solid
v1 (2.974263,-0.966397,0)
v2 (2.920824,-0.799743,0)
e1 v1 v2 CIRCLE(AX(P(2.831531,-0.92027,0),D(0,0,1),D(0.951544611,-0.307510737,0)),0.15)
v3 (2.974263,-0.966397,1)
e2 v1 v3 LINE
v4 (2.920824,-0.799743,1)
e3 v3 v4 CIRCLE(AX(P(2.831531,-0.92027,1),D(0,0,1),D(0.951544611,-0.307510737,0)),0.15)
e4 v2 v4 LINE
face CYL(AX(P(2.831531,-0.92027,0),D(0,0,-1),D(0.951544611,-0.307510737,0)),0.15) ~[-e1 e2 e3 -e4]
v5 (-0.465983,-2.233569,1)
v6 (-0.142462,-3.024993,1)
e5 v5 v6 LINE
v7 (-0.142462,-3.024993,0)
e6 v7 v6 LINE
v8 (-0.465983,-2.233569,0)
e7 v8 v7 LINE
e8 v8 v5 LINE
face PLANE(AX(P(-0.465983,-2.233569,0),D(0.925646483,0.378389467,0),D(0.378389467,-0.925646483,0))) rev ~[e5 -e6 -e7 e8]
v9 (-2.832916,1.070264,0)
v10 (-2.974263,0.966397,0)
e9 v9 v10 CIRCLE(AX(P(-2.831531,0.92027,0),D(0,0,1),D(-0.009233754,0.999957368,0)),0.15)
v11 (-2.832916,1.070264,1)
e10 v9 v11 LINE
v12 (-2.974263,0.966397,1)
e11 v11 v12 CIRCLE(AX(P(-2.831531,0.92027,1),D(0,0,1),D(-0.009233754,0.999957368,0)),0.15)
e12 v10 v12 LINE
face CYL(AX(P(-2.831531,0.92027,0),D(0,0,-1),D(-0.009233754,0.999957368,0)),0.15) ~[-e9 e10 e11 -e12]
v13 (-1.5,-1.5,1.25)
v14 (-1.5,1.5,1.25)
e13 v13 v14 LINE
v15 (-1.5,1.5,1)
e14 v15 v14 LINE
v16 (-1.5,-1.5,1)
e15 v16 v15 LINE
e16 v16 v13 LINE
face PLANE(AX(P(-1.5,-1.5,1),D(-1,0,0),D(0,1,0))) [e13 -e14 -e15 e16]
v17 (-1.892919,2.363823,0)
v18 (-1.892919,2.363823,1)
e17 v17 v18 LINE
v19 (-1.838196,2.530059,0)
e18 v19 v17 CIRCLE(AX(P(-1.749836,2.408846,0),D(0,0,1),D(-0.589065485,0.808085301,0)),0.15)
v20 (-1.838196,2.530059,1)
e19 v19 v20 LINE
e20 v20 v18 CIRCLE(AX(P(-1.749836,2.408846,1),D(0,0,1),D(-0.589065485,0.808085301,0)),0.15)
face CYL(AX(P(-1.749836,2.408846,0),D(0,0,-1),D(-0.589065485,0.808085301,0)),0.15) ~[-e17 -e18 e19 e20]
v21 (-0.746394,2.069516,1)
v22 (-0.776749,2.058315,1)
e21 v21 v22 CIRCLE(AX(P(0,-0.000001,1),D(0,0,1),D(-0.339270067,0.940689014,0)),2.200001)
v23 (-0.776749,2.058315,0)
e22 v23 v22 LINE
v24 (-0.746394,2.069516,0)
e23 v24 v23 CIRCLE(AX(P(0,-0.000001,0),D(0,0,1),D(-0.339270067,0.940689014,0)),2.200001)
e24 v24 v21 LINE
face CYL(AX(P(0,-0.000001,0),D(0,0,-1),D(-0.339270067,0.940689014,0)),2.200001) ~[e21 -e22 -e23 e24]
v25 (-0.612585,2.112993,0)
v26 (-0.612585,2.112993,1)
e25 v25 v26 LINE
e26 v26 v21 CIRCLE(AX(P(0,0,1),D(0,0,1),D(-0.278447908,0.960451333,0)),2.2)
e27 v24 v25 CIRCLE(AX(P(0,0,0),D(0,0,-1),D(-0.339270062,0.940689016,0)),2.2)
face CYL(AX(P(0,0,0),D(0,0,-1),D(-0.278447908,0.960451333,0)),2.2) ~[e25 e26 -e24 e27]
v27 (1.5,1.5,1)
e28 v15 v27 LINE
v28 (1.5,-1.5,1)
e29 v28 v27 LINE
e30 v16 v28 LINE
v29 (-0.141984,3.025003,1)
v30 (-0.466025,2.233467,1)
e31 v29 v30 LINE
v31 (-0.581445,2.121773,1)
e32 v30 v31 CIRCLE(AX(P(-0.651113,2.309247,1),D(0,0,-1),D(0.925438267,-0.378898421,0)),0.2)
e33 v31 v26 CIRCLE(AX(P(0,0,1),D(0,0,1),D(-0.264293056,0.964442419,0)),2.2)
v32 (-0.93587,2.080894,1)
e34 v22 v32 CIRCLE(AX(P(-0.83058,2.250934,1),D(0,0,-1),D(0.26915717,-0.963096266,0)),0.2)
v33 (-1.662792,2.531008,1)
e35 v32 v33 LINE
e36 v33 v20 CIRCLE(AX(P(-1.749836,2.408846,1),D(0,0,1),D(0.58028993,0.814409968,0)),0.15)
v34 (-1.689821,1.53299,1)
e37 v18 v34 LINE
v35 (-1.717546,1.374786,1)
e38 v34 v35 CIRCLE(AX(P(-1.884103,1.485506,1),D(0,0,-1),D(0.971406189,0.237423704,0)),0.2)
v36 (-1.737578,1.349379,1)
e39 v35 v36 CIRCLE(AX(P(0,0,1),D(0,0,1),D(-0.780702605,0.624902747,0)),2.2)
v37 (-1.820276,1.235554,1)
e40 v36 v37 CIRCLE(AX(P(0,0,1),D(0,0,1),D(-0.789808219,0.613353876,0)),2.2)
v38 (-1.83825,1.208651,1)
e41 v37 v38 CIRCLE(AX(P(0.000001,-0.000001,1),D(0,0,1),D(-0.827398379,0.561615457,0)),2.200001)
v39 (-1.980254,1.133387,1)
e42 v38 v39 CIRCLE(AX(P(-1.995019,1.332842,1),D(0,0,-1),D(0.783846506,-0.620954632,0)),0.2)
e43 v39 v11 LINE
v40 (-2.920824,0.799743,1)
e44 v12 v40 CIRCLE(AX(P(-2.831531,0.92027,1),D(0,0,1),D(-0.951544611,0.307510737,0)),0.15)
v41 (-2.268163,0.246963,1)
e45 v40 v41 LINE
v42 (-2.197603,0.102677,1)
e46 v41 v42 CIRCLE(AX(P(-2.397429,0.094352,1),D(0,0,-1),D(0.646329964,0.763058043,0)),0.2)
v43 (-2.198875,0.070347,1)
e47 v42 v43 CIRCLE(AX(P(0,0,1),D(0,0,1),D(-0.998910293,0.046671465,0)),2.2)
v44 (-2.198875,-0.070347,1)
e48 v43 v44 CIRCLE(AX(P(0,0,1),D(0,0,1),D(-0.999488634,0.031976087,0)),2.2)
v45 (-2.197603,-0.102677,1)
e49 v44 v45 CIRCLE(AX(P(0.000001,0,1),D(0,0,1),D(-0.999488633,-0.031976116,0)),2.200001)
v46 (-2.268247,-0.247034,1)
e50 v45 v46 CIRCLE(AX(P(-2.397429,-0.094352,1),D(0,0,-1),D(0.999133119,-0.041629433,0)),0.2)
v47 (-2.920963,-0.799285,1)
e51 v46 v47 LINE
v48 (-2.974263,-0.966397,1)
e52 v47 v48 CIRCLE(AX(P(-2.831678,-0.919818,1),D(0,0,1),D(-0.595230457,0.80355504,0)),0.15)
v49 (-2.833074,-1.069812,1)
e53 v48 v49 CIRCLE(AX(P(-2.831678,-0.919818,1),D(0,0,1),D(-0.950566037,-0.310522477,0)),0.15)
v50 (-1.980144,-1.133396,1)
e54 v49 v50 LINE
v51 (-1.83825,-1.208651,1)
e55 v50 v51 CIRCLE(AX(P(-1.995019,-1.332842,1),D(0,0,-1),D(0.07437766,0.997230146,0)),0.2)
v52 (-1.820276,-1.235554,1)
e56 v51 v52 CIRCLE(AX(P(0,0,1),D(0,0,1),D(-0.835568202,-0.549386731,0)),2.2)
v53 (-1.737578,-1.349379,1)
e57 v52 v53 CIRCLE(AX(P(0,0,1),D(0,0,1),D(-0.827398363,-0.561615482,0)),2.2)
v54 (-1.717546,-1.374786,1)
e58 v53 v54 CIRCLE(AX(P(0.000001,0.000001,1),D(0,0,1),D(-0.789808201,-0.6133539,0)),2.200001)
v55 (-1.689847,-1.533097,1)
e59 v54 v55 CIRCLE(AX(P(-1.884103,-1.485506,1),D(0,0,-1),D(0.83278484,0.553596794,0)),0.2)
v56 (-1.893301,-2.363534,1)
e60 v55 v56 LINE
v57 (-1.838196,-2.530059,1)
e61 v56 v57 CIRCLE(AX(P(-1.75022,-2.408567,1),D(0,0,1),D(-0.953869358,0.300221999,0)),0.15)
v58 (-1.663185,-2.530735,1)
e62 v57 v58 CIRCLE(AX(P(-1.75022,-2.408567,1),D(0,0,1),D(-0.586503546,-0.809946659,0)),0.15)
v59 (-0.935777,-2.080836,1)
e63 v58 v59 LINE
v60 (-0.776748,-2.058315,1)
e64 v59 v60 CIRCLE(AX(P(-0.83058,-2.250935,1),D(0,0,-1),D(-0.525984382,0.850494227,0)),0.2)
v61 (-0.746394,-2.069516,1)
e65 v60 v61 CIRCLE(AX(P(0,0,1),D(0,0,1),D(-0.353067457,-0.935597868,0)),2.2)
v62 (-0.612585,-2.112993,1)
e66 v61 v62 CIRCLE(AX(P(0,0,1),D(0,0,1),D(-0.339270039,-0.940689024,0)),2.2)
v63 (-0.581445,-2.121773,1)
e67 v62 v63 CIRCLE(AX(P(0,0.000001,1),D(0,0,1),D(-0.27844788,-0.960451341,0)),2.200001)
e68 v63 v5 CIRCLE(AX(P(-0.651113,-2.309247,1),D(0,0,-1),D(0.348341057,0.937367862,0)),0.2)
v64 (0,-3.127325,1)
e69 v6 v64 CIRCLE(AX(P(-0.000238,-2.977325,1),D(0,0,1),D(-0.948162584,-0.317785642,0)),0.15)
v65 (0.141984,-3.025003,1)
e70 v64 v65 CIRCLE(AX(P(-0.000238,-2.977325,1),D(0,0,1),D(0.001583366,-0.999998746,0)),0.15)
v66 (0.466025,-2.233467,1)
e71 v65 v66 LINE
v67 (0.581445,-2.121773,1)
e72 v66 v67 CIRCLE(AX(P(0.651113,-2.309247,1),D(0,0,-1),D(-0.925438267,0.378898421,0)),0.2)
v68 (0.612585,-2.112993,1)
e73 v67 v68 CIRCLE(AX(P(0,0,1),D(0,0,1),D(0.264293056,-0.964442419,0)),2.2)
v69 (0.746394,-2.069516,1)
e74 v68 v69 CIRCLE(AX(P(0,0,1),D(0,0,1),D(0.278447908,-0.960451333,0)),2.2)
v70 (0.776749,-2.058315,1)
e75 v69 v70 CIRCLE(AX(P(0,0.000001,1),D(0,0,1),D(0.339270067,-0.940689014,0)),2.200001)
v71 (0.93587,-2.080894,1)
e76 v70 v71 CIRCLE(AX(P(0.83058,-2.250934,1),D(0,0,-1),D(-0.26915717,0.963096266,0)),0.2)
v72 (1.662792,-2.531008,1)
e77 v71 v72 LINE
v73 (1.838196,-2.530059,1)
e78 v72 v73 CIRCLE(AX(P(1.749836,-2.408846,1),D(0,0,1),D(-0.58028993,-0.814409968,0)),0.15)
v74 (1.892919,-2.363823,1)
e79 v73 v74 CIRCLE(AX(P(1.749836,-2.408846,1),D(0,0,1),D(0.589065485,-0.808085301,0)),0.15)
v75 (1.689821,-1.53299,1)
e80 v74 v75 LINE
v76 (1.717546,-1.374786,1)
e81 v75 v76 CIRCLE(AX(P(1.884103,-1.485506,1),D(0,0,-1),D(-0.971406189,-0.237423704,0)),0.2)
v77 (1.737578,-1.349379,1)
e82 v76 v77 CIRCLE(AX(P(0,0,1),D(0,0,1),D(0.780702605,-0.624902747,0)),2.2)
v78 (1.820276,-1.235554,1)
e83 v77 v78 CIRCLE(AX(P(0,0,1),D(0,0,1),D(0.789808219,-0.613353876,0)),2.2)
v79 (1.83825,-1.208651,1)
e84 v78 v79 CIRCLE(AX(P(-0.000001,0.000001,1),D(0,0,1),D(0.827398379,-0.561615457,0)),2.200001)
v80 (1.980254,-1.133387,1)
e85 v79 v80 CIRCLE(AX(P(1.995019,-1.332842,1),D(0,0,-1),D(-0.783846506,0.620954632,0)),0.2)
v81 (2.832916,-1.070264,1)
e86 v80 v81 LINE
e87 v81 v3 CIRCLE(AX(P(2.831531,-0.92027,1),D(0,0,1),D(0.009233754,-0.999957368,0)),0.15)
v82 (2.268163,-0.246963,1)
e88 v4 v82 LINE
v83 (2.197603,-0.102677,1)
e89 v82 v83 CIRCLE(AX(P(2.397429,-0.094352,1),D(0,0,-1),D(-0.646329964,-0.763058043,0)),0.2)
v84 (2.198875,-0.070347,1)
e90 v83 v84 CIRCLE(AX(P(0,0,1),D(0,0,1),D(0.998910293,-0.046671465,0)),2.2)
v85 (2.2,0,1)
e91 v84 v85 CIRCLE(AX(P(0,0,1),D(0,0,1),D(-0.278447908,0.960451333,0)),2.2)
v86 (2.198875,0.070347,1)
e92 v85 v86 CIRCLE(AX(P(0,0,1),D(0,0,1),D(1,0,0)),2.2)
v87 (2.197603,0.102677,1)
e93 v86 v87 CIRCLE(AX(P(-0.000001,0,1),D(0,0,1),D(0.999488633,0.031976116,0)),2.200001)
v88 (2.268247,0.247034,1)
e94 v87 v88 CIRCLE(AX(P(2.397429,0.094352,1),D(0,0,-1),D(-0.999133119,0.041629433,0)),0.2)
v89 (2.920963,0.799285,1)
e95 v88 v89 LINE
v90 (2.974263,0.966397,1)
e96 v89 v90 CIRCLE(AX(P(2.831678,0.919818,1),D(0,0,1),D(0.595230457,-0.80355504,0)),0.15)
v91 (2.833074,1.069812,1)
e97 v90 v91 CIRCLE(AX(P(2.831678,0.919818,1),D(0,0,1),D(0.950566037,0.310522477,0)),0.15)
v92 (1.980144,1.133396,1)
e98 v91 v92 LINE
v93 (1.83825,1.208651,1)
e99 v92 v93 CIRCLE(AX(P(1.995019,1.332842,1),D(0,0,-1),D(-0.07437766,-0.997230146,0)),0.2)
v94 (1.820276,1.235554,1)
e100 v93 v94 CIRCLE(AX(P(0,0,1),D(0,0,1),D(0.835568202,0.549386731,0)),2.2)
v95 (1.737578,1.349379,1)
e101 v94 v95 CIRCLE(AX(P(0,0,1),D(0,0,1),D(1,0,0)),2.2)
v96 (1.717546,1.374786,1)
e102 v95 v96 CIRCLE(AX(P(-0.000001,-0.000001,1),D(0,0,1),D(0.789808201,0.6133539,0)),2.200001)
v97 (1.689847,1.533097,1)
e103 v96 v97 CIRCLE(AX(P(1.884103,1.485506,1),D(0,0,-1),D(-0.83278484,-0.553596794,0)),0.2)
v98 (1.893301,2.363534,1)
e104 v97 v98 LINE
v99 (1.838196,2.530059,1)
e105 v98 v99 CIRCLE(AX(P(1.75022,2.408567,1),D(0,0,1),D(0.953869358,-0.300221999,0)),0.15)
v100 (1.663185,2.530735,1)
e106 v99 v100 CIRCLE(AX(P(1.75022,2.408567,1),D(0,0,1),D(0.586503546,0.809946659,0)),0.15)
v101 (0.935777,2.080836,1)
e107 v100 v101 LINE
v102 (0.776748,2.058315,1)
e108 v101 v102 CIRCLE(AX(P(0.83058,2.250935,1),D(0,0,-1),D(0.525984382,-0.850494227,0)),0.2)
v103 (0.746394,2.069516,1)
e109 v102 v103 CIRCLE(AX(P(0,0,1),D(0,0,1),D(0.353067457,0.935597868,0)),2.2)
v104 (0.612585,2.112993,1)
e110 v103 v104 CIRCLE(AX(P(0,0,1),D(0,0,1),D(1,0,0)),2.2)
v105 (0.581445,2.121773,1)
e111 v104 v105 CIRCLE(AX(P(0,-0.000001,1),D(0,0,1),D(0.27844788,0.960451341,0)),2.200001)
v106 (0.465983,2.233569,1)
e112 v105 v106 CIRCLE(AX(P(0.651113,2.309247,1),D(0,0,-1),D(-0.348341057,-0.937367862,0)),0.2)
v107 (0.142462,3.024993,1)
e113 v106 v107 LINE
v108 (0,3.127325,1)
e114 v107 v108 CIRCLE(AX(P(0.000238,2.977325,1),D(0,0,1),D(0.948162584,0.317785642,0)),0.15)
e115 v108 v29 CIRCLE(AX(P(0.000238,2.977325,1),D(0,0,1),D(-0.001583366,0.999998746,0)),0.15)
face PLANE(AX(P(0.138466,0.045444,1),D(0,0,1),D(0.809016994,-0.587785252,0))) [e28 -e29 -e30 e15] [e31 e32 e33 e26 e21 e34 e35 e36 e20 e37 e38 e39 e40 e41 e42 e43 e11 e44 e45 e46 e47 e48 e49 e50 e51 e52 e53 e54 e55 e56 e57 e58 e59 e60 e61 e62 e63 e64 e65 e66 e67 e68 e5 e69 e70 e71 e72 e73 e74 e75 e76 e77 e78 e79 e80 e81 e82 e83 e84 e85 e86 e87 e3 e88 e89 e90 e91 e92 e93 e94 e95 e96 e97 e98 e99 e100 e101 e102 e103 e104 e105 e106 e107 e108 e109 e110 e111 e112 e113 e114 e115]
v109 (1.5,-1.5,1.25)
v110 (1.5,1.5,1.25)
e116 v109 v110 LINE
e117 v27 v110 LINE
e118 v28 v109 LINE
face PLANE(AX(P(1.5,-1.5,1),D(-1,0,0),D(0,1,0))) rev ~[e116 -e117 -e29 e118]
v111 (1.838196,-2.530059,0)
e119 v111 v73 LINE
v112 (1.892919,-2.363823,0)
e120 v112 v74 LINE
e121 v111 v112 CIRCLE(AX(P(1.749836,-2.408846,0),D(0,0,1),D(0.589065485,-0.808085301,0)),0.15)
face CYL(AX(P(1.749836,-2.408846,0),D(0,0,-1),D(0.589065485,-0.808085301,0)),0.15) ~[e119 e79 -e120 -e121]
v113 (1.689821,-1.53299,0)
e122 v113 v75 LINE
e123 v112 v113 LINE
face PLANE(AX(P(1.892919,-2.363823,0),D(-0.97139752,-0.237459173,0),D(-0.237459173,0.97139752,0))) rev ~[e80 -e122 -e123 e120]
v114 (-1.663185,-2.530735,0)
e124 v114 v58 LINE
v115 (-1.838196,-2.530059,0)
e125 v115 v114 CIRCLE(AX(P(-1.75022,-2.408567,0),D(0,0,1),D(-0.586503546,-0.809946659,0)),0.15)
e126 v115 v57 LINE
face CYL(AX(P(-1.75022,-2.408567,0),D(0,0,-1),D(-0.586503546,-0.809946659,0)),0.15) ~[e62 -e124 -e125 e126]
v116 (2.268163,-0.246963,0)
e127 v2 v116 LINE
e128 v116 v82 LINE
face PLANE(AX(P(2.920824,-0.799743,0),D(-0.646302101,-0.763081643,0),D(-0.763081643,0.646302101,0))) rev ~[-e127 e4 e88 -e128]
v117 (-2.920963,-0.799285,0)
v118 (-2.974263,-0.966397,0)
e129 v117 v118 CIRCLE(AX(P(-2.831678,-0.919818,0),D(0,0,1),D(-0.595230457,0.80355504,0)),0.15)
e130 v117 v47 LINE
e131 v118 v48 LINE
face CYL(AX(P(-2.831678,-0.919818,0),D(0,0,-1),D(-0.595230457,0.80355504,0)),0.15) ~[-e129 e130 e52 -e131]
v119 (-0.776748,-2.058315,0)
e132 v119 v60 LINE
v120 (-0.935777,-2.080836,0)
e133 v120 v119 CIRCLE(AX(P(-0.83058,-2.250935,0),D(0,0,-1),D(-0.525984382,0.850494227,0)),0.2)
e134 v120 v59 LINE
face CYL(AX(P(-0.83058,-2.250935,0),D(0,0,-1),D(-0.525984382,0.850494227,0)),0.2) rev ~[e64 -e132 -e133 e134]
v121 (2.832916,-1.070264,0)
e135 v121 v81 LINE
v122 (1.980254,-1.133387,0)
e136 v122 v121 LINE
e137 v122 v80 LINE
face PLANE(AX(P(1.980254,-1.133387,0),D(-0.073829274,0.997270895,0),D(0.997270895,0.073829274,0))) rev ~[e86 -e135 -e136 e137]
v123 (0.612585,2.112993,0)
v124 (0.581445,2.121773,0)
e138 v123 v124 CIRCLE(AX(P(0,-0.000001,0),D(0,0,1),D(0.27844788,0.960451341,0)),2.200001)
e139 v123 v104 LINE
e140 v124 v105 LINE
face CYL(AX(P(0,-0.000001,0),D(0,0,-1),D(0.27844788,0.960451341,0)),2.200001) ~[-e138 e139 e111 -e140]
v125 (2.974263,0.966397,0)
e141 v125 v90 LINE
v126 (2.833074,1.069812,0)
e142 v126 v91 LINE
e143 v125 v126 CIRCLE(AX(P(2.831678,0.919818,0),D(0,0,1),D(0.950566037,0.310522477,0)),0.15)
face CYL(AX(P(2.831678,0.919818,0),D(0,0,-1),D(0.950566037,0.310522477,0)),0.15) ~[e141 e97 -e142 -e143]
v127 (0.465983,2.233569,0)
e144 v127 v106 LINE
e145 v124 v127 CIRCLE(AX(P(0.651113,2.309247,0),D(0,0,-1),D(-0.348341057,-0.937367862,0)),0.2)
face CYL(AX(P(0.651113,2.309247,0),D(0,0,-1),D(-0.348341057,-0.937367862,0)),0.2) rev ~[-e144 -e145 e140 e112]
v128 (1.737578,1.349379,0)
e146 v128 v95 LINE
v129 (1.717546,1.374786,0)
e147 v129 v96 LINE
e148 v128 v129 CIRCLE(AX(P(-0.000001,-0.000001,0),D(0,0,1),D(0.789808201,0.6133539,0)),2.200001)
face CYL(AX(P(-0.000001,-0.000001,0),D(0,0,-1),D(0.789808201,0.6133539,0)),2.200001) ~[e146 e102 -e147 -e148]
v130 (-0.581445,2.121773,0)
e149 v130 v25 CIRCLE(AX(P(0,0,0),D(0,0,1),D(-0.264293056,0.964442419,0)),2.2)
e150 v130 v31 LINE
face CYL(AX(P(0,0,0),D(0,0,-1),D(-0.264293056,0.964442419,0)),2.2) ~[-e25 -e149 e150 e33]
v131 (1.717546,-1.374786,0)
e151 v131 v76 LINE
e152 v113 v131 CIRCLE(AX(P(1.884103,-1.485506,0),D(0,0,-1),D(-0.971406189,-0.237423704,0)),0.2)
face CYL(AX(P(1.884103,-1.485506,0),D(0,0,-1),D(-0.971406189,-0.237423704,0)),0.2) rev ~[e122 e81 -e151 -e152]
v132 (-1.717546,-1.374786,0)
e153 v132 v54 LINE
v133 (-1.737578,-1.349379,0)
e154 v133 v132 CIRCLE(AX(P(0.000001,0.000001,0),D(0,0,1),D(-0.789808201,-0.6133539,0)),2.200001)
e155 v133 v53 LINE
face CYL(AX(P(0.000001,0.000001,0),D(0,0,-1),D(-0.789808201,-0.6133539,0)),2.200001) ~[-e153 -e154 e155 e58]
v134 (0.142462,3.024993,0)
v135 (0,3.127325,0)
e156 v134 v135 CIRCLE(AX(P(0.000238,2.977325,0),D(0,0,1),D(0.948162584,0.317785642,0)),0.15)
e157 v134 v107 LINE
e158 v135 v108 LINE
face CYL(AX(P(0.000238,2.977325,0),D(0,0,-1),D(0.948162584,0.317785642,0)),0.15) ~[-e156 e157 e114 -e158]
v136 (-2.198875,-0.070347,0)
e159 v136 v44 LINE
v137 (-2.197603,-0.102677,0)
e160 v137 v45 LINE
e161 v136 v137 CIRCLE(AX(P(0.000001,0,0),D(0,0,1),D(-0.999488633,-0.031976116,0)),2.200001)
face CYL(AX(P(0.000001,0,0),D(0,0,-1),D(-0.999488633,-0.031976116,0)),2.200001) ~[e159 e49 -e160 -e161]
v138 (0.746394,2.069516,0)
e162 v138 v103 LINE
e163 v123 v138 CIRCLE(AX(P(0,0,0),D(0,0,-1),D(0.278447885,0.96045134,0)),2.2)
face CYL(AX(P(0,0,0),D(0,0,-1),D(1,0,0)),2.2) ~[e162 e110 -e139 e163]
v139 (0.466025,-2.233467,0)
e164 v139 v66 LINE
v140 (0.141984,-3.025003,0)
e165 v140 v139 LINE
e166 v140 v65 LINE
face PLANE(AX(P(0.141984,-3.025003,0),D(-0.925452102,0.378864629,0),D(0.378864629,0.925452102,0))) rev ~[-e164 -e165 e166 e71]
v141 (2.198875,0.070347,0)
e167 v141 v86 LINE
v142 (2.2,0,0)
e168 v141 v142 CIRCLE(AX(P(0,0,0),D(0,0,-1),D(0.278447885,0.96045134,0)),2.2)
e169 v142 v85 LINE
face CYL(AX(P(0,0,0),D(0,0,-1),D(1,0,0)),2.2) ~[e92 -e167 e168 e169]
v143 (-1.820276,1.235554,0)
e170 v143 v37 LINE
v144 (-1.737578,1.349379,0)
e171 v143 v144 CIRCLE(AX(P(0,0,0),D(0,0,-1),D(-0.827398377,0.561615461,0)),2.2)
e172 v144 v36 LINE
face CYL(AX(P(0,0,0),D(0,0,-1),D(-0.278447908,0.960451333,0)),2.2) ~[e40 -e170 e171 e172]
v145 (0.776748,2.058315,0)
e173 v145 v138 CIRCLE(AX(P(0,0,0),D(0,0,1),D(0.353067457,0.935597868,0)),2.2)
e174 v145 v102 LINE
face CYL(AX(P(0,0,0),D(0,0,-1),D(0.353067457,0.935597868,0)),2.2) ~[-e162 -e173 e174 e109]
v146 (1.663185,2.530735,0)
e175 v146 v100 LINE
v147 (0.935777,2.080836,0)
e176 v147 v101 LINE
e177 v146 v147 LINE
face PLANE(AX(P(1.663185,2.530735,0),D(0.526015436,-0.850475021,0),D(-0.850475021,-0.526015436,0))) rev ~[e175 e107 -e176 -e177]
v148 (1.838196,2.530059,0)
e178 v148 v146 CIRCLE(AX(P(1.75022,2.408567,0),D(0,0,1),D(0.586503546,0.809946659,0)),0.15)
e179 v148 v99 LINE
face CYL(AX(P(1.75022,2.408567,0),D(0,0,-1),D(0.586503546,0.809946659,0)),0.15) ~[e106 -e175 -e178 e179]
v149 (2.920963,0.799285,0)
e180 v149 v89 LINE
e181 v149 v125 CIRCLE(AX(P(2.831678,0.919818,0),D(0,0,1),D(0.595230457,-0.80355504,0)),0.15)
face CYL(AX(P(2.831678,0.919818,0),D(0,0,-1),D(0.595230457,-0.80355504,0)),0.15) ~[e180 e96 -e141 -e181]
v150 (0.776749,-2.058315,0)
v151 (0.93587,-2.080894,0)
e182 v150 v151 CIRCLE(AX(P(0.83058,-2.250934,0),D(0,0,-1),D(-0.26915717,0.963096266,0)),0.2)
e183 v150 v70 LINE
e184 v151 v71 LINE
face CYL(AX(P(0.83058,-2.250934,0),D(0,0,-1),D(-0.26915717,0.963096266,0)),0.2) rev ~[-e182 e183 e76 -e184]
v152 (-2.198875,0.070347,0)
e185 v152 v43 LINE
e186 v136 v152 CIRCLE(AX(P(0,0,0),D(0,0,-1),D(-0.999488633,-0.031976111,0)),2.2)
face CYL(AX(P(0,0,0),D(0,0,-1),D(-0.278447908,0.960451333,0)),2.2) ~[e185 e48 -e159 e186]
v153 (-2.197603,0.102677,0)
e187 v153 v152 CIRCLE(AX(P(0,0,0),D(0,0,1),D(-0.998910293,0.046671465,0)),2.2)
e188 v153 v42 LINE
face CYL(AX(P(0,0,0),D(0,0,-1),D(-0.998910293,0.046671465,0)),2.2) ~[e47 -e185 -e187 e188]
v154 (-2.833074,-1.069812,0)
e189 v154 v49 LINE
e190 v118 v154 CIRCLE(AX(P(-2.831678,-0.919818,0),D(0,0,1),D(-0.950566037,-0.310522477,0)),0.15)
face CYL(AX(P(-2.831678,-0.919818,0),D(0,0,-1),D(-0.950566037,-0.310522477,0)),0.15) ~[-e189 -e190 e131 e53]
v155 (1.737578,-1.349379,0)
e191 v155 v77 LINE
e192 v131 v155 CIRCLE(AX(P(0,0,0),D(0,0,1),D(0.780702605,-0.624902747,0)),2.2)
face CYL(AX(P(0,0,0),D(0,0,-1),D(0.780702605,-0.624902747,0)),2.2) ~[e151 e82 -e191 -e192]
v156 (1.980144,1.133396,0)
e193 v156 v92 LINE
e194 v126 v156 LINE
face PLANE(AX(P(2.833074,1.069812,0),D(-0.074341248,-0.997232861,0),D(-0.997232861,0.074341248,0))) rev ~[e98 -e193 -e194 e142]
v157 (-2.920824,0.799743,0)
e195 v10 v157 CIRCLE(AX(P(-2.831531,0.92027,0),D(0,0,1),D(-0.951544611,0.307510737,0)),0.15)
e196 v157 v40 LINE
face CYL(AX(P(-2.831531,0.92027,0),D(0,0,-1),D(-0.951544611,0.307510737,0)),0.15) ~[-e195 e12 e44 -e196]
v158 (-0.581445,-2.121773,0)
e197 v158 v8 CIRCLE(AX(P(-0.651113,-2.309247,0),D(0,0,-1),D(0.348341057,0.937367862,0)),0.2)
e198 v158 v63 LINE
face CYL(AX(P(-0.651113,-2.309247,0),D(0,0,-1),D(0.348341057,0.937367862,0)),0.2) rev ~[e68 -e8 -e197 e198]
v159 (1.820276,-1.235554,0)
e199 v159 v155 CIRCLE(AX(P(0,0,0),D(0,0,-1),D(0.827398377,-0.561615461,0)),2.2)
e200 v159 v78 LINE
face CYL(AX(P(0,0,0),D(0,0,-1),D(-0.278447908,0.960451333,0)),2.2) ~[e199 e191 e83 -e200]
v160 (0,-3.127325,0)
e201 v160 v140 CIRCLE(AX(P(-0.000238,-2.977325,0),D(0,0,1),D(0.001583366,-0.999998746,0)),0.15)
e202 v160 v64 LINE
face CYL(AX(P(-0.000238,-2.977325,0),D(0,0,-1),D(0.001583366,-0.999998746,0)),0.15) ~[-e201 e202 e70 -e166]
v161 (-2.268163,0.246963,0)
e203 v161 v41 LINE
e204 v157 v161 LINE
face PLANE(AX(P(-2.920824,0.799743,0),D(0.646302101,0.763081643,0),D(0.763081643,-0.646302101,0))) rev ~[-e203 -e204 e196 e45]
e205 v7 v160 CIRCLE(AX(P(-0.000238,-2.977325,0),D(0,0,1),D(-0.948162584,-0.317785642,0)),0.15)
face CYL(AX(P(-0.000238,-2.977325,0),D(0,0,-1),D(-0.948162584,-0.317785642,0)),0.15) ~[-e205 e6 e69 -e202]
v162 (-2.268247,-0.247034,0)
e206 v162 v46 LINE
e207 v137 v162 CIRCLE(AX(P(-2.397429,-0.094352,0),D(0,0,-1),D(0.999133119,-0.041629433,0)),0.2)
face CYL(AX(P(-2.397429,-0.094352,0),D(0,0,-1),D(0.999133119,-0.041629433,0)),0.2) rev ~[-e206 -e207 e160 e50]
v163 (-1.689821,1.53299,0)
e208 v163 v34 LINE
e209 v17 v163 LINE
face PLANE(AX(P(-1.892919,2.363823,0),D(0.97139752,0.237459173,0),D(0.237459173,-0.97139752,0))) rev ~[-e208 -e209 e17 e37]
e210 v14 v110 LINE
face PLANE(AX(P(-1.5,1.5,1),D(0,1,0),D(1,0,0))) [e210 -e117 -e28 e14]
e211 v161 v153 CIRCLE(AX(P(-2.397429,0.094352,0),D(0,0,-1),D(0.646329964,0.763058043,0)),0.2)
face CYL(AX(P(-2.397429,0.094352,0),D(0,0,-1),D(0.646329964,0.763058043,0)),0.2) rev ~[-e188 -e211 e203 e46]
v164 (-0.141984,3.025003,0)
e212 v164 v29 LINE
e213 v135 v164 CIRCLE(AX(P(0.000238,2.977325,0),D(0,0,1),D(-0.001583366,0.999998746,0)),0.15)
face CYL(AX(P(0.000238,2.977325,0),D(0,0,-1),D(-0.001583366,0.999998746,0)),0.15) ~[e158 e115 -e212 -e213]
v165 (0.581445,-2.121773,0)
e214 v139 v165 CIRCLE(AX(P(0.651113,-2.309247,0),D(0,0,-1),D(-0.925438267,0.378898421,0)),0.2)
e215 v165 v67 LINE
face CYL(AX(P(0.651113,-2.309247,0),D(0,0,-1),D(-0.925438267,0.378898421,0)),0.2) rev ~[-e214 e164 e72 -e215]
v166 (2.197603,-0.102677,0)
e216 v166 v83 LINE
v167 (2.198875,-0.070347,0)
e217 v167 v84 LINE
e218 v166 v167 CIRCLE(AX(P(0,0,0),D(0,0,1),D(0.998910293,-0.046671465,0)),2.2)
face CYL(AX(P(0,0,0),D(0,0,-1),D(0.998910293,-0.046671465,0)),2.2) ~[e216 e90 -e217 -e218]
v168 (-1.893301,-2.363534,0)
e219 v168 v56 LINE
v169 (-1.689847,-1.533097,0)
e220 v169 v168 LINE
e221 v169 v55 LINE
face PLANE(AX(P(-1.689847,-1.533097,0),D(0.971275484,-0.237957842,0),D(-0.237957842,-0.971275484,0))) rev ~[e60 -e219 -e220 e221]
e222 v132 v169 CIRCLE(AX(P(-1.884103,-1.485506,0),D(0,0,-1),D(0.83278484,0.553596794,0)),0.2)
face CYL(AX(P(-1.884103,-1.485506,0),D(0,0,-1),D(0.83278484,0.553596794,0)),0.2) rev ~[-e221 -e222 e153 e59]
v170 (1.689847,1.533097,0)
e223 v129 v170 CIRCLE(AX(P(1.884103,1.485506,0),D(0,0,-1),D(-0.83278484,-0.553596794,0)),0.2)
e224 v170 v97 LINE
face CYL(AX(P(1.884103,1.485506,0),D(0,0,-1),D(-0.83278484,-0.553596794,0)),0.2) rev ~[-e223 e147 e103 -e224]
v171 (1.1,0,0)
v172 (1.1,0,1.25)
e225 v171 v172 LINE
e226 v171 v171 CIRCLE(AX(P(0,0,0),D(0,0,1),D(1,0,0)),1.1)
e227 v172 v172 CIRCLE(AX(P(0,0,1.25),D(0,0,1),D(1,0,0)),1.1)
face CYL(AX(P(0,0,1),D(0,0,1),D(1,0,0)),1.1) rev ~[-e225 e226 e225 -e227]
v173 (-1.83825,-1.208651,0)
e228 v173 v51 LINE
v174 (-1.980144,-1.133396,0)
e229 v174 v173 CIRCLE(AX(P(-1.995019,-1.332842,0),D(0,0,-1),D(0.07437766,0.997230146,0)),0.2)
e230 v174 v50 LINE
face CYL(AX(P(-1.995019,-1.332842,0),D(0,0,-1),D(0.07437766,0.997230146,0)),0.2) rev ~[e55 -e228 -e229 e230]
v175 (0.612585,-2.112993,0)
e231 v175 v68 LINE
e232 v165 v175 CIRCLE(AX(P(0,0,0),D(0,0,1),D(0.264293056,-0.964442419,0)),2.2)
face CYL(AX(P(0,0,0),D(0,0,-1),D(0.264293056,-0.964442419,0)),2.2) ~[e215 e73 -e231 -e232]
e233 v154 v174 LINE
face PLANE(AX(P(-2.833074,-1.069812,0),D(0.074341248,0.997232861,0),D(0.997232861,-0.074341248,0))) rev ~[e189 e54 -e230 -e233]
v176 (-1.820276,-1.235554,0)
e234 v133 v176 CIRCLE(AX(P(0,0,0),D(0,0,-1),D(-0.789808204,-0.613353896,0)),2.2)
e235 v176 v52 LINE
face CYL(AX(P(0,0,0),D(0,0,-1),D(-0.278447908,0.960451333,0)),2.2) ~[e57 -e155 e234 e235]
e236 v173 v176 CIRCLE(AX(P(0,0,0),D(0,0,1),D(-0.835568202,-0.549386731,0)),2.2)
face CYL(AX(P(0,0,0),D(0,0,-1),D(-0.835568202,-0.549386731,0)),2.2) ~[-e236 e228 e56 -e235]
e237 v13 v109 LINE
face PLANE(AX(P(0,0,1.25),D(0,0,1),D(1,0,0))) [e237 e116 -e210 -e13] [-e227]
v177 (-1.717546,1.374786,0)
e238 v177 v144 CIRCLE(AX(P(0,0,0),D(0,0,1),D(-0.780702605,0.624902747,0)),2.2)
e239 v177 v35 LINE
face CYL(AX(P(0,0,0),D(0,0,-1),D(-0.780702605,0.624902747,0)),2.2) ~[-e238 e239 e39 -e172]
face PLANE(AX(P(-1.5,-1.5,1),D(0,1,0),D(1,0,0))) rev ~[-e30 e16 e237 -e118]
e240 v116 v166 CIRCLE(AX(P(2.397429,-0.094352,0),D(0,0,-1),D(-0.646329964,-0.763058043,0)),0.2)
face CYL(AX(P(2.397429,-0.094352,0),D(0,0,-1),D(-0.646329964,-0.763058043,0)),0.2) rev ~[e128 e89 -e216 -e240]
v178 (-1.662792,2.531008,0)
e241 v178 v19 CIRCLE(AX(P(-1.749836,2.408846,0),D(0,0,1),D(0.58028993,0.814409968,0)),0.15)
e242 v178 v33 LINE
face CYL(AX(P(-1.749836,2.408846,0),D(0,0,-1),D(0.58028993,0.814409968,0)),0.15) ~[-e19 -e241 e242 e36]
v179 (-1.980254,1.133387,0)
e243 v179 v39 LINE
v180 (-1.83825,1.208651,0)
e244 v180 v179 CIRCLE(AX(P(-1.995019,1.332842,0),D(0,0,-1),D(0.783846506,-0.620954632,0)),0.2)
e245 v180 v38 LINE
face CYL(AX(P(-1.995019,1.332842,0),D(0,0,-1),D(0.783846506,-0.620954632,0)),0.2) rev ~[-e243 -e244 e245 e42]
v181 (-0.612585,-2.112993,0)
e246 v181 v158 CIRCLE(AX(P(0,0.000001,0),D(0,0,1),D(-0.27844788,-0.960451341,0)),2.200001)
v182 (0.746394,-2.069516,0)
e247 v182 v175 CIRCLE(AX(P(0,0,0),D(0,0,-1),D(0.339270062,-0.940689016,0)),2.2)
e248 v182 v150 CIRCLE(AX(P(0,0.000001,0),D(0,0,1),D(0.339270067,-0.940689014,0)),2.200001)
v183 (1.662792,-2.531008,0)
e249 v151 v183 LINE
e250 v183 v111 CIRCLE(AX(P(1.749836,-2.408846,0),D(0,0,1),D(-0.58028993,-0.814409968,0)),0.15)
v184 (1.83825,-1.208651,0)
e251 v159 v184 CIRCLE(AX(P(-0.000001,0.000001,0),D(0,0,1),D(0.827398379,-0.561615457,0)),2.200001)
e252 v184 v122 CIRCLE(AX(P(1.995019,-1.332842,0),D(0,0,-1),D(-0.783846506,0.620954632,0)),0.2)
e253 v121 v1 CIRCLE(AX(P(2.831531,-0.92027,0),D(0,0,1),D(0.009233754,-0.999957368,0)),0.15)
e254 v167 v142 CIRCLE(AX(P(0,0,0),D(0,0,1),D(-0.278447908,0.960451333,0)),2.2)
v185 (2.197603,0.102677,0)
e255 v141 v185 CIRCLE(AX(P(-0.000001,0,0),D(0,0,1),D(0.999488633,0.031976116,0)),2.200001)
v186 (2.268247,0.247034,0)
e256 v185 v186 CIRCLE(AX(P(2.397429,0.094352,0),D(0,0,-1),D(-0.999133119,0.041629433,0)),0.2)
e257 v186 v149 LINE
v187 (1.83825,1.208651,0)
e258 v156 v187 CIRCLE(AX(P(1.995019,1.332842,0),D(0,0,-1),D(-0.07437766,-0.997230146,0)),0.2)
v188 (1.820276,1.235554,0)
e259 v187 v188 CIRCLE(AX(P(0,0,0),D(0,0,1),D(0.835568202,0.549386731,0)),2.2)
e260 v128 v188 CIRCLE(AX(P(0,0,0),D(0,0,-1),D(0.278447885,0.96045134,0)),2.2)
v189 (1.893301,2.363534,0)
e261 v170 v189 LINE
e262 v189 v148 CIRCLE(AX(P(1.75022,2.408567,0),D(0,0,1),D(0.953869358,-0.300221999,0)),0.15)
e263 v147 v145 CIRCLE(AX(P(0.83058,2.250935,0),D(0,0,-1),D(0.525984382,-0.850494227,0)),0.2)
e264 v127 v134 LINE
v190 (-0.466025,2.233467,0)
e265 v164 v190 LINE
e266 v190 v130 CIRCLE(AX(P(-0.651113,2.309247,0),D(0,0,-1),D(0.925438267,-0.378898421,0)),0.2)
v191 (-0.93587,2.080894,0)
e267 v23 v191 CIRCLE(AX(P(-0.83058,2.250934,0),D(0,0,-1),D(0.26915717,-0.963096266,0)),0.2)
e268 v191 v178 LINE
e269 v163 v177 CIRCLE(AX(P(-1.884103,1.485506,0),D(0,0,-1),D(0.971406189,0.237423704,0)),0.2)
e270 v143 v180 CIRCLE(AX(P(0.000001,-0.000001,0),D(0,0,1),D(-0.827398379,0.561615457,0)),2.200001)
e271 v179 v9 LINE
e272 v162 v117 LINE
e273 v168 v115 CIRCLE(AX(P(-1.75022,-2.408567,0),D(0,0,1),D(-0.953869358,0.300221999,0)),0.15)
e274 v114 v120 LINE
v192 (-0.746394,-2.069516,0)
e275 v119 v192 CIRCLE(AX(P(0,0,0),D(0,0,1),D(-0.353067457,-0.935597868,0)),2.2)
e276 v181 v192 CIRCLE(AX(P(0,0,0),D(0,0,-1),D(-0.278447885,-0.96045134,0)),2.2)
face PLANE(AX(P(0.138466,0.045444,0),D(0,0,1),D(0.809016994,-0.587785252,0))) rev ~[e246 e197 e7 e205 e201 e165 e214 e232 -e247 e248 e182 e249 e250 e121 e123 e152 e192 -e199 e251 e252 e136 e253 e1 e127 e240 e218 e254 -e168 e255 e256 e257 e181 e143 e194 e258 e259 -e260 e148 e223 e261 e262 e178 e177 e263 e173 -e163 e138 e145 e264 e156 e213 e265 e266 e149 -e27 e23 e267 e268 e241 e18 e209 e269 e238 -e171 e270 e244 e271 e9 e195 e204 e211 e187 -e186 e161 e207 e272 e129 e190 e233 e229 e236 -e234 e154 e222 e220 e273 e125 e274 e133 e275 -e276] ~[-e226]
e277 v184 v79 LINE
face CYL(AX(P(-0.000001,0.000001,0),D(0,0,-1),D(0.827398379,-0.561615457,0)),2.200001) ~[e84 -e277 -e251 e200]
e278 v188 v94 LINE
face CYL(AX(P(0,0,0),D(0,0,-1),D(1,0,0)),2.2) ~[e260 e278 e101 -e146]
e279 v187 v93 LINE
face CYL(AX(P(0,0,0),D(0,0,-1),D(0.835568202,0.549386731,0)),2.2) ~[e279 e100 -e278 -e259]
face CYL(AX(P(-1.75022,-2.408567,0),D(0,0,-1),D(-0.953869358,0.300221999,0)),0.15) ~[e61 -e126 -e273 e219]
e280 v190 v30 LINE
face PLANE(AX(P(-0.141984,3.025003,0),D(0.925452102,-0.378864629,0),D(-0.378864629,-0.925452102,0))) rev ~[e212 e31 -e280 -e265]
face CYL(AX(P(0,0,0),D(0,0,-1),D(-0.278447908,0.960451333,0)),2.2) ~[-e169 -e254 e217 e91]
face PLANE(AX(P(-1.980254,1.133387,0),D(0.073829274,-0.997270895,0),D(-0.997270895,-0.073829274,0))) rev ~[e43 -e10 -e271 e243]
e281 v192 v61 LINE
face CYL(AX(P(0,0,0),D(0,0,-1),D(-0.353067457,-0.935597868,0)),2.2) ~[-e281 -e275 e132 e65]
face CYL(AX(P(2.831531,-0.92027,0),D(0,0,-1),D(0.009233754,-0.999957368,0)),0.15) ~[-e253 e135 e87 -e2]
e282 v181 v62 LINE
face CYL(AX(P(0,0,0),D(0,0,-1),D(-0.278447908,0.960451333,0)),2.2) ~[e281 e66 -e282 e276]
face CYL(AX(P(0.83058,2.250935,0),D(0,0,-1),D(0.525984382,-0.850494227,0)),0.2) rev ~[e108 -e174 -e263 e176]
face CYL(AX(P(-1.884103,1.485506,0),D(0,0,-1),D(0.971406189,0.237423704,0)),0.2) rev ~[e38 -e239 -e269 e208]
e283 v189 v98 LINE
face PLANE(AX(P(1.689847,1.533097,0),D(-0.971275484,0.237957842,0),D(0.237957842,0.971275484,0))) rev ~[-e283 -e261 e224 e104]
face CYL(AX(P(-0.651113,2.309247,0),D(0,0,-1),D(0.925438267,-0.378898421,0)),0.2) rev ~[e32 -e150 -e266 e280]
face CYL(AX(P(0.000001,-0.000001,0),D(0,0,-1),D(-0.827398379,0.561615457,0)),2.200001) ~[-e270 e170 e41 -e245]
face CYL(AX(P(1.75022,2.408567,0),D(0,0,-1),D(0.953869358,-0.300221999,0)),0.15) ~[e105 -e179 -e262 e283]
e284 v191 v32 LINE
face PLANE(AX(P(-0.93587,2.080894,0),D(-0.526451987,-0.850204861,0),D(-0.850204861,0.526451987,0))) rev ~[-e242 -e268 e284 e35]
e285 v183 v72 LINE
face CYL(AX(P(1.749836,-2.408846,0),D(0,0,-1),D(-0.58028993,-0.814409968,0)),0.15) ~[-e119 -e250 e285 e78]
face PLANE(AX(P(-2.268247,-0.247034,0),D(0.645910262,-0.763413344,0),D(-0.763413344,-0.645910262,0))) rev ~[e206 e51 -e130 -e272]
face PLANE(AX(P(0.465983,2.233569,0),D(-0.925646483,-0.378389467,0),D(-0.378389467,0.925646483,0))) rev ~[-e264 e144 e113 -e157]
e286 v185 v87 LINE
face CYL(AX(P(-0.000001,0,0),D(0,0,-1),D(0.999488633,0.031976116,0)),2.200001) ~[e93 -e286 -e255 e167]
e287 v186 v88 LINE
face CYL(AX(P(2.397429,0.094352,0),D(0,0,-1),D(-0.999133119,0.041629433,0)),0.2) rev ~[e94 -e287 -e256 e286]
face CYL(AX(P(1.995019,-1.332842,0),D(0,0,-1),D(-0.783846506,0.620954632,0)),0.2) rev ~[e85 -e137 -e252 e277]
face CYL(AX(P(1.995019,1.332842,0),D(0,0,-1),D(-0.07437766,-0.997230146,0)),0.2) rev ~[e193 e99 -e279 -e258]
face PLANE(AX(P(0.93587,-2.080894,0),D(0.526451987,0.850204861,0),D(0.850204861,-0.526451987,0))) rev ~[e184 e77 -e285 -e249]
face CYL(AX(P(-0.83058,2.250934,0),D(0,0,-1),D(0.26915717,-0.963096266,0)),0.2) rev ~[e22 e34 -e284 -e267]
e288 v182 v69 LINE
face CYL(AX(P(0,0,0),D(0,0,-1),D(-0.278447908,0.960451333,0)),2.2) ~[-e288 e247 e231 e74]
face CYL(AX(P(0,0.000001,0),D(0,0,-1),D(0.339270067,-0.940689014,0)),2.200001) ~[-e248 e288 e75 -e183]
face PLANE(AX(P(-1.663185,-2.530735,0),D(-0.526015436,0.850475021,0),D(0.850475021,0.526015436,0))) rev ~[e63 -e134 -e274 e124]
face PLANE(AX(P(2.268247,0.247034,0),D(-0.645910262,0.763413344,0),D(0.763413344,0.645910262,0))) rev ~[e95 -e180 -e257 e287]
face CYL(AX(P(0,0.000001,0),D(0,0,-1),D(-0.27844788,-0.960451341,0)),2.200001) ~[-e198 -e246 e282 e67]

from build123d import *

# Parameters (mm, degrees)
F1_DEPTH        = 1
F1_COPIES_COUNT = 10
F3_W            = 3
F3_H            = 3
F4_DEPTH        = 0.25
F5_DEPTH        = 1
F6_DEPTH        = 0.25
F7_R            = 1.1
F8_DEPTH        = 12.5


# Not quite as in the source:
# - ends of sketch curves that miss each other by under 0.0002 mm in the source are joined
# - a feature of the source that left no trace in its solid (it failed there, or was rolled back) is left out
# - a pattern or mirror of a feature is missing from the dataset's text; its kind, count and spacing are read off the source's solid


with BuildPart() as f1:
    # F0 (on Top) → F1 (new body)
    with BuildSketch(Plane.XY):
        with BuildLine():
            ThreePointArc((0.581444512, 2.1217733808), (0.2933415776, 2.1803556405), (0, 2.2))
            ThreePointArc((0, 2.2), (-0.2933416878, 2.1803556256), (-0.5814447265, 2.121773322))
            ThreePointArc((-0.5814447265, 2.121773322), (-0.5968372157, 2.1167523736), (-0.6125853979, 2.1129929319))
            ThreePointArc((-0.6125853979, 2.1129929319), (-1.3214219849, -1.7589326132), (2.2, 0))
            ThreePointArc((2.2, 0), (1.7589325969, 1.3214220066), (0.612585346, 2.112992947))
            ThreePointArc((0.6125853416, 2.1129929319), (0.5968370782, 2.1167523965), (0.581444512, 2.1217733808))
        make_face()
        with BuildLine():
            ThreePointArc((0.6, 0.8), (0, -1), (-0.6, 0.8))
            Line((-0.6, 0.8), (0, 0.8))
            Line((0, 0.8), (0.6, 0.8))
        make_face(mode=Mode.SUBTRACT)
        with BuildLine():
            ThreePointArc((-0.5814447265, 2.121773322), (-0.2933416878, 2.1803556256), (0, 2.2))
            Line((0, 2.2), (0, 2.8273255734))
            ThreePointArc((0, 2.8273255734), (-0.1215931939, 2.889819495), (-0.1419835484, 3.0250031792))
            Line((-0.1419835484, 3.0250031792), (-0.4660251262, 2.233467269))
            ThreePointArc((-0.4660251262, 2.233467269), (-0.5120300634, 2.1655250062), (-0.5814447265, 2.121773322))
        make_face()
        with BuildLine():
            Line((0, 2.8273255734), (0, 2.2))
            ThreePointArc((0, 2.2), (0.2933415776, 2.1803556405), (0.581444512, 2.1217733808))
            ThreePointArc((0.581444512, 2.1217733808), (0.5119904355, 2.165563311), (0.4659834267, 2.2335690598))
            Line((0.4659834267, 2.2335690598), (0.1424618925, 3.0249932315))
            ThreePointArc((0.1424618925, 3.0249932315), (0.1482808399, 3.0014743175), (0.1502375048, 2.9773253853))
            ThreePointArc((0.1502375048, 2.9773253853), (0.1062195181, 2.8711754307), (0, 2.8273255734))
        make_face()
        with BuildLine():
            ThreePointArc((-0.1419835484, 3.0250031792), (-0.1215931939, 2.889819495), (0, 2.8273255734))
            Line((0, 2.8273255734), (0, 3.1273251973))
            ThreePointArc((0, 3.1273251973), (-0.0874611784, 3.0990173775), (-0.1419835484, 3.0250031792))
        make_face()
        with BuildLine():
            Line((0, 3.1273251973), (0, 2.8273255734))
            ThreePointArc((0, 2.8273255734), (0.1062195181, 2.8711754307), (0.1502375048, 2.9773253853))
            ThreePointArc((0.1502375048, 2.9773253853), (0.1482808399, 3.0014743175), (0.1424618925, 3.0249932315))
            ThreePointArc((0.1424618925, 3.0249932315), (0.0877476558, 3.0991530237), (0, 3.1273251973))
        make_face()
        with BuildLine():
            ThreePointArc((0.612585346, 2.112992947), (0.5970310708, 2.1174404125), (0.581444512, 2.1217733808))
            ThreePointArc((0.581444512, 2.1217733808), (0.5968370782, 2.1167523965), (0.6125853416, 2.1129929319))
        make_face()
        with BuildLine():
            ThreePointArc((-0.6125853979, 2.1129929319), (-0.5968372157, 2.1167523736), (-0.5814447265, 2.121773322))
            ThreePointArc((-0.5814447265, 2.121773322), (-0.5970312038, 2.117440375), (-0.6125853979, 2.1129929319))
        make_face()
    extrude(amount=F1_DEPTH)

    # F1_copies: F1 ×10 about axis
    f1_copies_axis = Axis((0, 0, 0), (0, 0, 1))


with BuildPart() as f1_1:
    add(f1.part)
    for i in range(1, F1_COPIES_COUNT):
        add(f1.part.rotate(f1_copies_axis, i * 360 / F1_COPIES_COUNT))

    # F3 (on face) → F4 (cut)
    with BuildSketch(Plane.XY.offset(1)):
        Rectangle(F3_W, F3_H)
    extrude(amount=-F4_DEPTH, mode=Mode.SUBTRACT)

    # F0 (on Top) → F5 (join)
    with BuildSketch(Plane.XY):
        with BuildLine():
            ThreePointArc((0.581444512, 2.1217733808), (0.2933415776, 2.1803556405), (0, 2.2))
            ThreePointArc((0, 2.2), (-0.2933416878, 2.1803556256), (-0.5814447265, 2.121773322))
            ThreePointArc((-0.5814447265, 2.121773322), (-0.5968372157, 2.1167523736), (-0.6125853979, 2.1129929319))
            ThreePointArc((-0.6125853979, 2.1129929319), (-1.3214219849, -1.7589326132), (2.2, 0))
            ThreePointArc((2.2, 0), (1.7589325969, 1.3214220066), (0.612585346, 2.112992947))
            ThreePointArc((0.6125853416, 2.1129929319), (0.5968370782, 2.1167523965), (0.581444512, 2.1217733808))
        make_face()
        with BuildLine():
            ThreePointArc((0.6, 0.8), (0, -1), (-0.6, 0.8))
            Line((-0.6, 0.8), (0, 0.8))
            Line((0, 0.8), (0.6, 0.8))
        make_face(mode=Mode.SUBTRACT)
        with BuildLine():
            ThreePointArc((-0.5814447265, 2.121773322), (-0.2933416878, 2.1803556256), (0, 2.2))
            Line((0, 2.2), (0, 2.8273255734))
            ThreePointArc((0, 2.8273255734), (-0.1215931939, 2.889819495), (-0.1419835484, 3.0250031792))
            Line((-0.1419835484, 3.0250031792), (-0.4660251262, 2.233467269))
            ThreePointArc((-0.4660251262, 2.233467269), (-0.5120300634, 2.1655250062), (-0.5814447265, 2.121773322))
        make_face()
        with BuildLine():
            Line((0, 2.8273255734), (0, 2.2))
            ThreePointArc((0, 2.2), (0.2933415776, 2.1803556405), (0.581444512, 2.1217733808))
            ThreePointArc((0.581444512, 2.1217733808), (0.5119904355, 2.165563311), (0.4659834267, 2.2335690598))
            Line((0.4659834267, 2.2335690598), (0.1424618925, 3.0249932315))
            ThreePointArc((0.1424618925, 3.0249932315), (0.1482808399, 3.0014743175), (0.1502375048, 2.9773253853))
            ThreePointArc((0.1502375048, 2.9773253853), (0.1062195181, 2.8711754307), (0, 2.8273255734))
        make_face()
        with BuildLine():
            ThreePointArc((-0.1419835484, 3.0250031792), (-0.1215931939, 2.889819495), (0, 2.8273255734))
            Line((0, 2.8273255734), (0, 3.1273251973))
            ThreePointArc((0, 3.1273251973), (-0.0874611784, 3.0990173775), (-0.1419835484, 3.0250031792))
        make_face()
        with BuildLine():
            Line((0, 3.1273251973), (0, 2.8273255734))
            ThreePointArc((0, 2.8273255734), (0.1062195181, 2.8711754307), (0.1502375048, 2.9773253853))
            ThreePointArc((0.1502375048, 2.9773253853), (0.1482808399, 3.0014743175), (0.1424618925, 3.0249932315))
            ThreePointArc((0.1424618925, 3.0249932315), (0.0877476558, 3.0991530237), (0, 3.1273251973))
        make_face()
        with BuildLine():
            ThreePointArc((0.612585346, 2.112992947), (0.5970310708, 2.1174404125), (0.581444512, 2.1217733808))
            ThreePointArc((0.581444512, 2.1217733808), (0.5968370782, 2.1167523965), (0.6125853416, 2.1129929319))
        make_face()
        with BuildLine():
            ThreePointArc((-0.6125853979, 2.1129929319), (-0.5968372157, 2.1167523736), (-0.5814447265, 2.121773322))
            ThreePointArc((-0.5814447265, 2.121773322), (-0.5970312038, 2.117440375), (-0.6125853979, 2.1129929319))
        make_face()
    extrude(amount=F5_DEPTH)

    # F3 (on face) → F6 (join)
    with BuildSketch(Plane.XY.offset(1)):
        Rectangle(F3_W, F3_H)
        Polygon((-0.259935757, 0.8), (0.259935757, 0.8), (0.6805206467, 0.494427191), (0.8411697794, 0), (0.6805206467, -0.494427191), (0.259935757, -0.8), (-0.259935757, -0.8), (-0.6805206467, -0.494427191), (-0.8411697794, 0), (-0.6805206467, 0.494427191), align=None, mode=Mode.SUBTRACT)
    extrude(amount=F6_DEPTH)

    # F7 (on face) → F8 (cut, symmetric)
    with BuildSketch(Plane.XY.offset(1)):
        Circle(F7_R)
    extrude(amount=F8_DEPTH, both=True, mode=Mode.SUBTRACT)


solid = f1_1.part
